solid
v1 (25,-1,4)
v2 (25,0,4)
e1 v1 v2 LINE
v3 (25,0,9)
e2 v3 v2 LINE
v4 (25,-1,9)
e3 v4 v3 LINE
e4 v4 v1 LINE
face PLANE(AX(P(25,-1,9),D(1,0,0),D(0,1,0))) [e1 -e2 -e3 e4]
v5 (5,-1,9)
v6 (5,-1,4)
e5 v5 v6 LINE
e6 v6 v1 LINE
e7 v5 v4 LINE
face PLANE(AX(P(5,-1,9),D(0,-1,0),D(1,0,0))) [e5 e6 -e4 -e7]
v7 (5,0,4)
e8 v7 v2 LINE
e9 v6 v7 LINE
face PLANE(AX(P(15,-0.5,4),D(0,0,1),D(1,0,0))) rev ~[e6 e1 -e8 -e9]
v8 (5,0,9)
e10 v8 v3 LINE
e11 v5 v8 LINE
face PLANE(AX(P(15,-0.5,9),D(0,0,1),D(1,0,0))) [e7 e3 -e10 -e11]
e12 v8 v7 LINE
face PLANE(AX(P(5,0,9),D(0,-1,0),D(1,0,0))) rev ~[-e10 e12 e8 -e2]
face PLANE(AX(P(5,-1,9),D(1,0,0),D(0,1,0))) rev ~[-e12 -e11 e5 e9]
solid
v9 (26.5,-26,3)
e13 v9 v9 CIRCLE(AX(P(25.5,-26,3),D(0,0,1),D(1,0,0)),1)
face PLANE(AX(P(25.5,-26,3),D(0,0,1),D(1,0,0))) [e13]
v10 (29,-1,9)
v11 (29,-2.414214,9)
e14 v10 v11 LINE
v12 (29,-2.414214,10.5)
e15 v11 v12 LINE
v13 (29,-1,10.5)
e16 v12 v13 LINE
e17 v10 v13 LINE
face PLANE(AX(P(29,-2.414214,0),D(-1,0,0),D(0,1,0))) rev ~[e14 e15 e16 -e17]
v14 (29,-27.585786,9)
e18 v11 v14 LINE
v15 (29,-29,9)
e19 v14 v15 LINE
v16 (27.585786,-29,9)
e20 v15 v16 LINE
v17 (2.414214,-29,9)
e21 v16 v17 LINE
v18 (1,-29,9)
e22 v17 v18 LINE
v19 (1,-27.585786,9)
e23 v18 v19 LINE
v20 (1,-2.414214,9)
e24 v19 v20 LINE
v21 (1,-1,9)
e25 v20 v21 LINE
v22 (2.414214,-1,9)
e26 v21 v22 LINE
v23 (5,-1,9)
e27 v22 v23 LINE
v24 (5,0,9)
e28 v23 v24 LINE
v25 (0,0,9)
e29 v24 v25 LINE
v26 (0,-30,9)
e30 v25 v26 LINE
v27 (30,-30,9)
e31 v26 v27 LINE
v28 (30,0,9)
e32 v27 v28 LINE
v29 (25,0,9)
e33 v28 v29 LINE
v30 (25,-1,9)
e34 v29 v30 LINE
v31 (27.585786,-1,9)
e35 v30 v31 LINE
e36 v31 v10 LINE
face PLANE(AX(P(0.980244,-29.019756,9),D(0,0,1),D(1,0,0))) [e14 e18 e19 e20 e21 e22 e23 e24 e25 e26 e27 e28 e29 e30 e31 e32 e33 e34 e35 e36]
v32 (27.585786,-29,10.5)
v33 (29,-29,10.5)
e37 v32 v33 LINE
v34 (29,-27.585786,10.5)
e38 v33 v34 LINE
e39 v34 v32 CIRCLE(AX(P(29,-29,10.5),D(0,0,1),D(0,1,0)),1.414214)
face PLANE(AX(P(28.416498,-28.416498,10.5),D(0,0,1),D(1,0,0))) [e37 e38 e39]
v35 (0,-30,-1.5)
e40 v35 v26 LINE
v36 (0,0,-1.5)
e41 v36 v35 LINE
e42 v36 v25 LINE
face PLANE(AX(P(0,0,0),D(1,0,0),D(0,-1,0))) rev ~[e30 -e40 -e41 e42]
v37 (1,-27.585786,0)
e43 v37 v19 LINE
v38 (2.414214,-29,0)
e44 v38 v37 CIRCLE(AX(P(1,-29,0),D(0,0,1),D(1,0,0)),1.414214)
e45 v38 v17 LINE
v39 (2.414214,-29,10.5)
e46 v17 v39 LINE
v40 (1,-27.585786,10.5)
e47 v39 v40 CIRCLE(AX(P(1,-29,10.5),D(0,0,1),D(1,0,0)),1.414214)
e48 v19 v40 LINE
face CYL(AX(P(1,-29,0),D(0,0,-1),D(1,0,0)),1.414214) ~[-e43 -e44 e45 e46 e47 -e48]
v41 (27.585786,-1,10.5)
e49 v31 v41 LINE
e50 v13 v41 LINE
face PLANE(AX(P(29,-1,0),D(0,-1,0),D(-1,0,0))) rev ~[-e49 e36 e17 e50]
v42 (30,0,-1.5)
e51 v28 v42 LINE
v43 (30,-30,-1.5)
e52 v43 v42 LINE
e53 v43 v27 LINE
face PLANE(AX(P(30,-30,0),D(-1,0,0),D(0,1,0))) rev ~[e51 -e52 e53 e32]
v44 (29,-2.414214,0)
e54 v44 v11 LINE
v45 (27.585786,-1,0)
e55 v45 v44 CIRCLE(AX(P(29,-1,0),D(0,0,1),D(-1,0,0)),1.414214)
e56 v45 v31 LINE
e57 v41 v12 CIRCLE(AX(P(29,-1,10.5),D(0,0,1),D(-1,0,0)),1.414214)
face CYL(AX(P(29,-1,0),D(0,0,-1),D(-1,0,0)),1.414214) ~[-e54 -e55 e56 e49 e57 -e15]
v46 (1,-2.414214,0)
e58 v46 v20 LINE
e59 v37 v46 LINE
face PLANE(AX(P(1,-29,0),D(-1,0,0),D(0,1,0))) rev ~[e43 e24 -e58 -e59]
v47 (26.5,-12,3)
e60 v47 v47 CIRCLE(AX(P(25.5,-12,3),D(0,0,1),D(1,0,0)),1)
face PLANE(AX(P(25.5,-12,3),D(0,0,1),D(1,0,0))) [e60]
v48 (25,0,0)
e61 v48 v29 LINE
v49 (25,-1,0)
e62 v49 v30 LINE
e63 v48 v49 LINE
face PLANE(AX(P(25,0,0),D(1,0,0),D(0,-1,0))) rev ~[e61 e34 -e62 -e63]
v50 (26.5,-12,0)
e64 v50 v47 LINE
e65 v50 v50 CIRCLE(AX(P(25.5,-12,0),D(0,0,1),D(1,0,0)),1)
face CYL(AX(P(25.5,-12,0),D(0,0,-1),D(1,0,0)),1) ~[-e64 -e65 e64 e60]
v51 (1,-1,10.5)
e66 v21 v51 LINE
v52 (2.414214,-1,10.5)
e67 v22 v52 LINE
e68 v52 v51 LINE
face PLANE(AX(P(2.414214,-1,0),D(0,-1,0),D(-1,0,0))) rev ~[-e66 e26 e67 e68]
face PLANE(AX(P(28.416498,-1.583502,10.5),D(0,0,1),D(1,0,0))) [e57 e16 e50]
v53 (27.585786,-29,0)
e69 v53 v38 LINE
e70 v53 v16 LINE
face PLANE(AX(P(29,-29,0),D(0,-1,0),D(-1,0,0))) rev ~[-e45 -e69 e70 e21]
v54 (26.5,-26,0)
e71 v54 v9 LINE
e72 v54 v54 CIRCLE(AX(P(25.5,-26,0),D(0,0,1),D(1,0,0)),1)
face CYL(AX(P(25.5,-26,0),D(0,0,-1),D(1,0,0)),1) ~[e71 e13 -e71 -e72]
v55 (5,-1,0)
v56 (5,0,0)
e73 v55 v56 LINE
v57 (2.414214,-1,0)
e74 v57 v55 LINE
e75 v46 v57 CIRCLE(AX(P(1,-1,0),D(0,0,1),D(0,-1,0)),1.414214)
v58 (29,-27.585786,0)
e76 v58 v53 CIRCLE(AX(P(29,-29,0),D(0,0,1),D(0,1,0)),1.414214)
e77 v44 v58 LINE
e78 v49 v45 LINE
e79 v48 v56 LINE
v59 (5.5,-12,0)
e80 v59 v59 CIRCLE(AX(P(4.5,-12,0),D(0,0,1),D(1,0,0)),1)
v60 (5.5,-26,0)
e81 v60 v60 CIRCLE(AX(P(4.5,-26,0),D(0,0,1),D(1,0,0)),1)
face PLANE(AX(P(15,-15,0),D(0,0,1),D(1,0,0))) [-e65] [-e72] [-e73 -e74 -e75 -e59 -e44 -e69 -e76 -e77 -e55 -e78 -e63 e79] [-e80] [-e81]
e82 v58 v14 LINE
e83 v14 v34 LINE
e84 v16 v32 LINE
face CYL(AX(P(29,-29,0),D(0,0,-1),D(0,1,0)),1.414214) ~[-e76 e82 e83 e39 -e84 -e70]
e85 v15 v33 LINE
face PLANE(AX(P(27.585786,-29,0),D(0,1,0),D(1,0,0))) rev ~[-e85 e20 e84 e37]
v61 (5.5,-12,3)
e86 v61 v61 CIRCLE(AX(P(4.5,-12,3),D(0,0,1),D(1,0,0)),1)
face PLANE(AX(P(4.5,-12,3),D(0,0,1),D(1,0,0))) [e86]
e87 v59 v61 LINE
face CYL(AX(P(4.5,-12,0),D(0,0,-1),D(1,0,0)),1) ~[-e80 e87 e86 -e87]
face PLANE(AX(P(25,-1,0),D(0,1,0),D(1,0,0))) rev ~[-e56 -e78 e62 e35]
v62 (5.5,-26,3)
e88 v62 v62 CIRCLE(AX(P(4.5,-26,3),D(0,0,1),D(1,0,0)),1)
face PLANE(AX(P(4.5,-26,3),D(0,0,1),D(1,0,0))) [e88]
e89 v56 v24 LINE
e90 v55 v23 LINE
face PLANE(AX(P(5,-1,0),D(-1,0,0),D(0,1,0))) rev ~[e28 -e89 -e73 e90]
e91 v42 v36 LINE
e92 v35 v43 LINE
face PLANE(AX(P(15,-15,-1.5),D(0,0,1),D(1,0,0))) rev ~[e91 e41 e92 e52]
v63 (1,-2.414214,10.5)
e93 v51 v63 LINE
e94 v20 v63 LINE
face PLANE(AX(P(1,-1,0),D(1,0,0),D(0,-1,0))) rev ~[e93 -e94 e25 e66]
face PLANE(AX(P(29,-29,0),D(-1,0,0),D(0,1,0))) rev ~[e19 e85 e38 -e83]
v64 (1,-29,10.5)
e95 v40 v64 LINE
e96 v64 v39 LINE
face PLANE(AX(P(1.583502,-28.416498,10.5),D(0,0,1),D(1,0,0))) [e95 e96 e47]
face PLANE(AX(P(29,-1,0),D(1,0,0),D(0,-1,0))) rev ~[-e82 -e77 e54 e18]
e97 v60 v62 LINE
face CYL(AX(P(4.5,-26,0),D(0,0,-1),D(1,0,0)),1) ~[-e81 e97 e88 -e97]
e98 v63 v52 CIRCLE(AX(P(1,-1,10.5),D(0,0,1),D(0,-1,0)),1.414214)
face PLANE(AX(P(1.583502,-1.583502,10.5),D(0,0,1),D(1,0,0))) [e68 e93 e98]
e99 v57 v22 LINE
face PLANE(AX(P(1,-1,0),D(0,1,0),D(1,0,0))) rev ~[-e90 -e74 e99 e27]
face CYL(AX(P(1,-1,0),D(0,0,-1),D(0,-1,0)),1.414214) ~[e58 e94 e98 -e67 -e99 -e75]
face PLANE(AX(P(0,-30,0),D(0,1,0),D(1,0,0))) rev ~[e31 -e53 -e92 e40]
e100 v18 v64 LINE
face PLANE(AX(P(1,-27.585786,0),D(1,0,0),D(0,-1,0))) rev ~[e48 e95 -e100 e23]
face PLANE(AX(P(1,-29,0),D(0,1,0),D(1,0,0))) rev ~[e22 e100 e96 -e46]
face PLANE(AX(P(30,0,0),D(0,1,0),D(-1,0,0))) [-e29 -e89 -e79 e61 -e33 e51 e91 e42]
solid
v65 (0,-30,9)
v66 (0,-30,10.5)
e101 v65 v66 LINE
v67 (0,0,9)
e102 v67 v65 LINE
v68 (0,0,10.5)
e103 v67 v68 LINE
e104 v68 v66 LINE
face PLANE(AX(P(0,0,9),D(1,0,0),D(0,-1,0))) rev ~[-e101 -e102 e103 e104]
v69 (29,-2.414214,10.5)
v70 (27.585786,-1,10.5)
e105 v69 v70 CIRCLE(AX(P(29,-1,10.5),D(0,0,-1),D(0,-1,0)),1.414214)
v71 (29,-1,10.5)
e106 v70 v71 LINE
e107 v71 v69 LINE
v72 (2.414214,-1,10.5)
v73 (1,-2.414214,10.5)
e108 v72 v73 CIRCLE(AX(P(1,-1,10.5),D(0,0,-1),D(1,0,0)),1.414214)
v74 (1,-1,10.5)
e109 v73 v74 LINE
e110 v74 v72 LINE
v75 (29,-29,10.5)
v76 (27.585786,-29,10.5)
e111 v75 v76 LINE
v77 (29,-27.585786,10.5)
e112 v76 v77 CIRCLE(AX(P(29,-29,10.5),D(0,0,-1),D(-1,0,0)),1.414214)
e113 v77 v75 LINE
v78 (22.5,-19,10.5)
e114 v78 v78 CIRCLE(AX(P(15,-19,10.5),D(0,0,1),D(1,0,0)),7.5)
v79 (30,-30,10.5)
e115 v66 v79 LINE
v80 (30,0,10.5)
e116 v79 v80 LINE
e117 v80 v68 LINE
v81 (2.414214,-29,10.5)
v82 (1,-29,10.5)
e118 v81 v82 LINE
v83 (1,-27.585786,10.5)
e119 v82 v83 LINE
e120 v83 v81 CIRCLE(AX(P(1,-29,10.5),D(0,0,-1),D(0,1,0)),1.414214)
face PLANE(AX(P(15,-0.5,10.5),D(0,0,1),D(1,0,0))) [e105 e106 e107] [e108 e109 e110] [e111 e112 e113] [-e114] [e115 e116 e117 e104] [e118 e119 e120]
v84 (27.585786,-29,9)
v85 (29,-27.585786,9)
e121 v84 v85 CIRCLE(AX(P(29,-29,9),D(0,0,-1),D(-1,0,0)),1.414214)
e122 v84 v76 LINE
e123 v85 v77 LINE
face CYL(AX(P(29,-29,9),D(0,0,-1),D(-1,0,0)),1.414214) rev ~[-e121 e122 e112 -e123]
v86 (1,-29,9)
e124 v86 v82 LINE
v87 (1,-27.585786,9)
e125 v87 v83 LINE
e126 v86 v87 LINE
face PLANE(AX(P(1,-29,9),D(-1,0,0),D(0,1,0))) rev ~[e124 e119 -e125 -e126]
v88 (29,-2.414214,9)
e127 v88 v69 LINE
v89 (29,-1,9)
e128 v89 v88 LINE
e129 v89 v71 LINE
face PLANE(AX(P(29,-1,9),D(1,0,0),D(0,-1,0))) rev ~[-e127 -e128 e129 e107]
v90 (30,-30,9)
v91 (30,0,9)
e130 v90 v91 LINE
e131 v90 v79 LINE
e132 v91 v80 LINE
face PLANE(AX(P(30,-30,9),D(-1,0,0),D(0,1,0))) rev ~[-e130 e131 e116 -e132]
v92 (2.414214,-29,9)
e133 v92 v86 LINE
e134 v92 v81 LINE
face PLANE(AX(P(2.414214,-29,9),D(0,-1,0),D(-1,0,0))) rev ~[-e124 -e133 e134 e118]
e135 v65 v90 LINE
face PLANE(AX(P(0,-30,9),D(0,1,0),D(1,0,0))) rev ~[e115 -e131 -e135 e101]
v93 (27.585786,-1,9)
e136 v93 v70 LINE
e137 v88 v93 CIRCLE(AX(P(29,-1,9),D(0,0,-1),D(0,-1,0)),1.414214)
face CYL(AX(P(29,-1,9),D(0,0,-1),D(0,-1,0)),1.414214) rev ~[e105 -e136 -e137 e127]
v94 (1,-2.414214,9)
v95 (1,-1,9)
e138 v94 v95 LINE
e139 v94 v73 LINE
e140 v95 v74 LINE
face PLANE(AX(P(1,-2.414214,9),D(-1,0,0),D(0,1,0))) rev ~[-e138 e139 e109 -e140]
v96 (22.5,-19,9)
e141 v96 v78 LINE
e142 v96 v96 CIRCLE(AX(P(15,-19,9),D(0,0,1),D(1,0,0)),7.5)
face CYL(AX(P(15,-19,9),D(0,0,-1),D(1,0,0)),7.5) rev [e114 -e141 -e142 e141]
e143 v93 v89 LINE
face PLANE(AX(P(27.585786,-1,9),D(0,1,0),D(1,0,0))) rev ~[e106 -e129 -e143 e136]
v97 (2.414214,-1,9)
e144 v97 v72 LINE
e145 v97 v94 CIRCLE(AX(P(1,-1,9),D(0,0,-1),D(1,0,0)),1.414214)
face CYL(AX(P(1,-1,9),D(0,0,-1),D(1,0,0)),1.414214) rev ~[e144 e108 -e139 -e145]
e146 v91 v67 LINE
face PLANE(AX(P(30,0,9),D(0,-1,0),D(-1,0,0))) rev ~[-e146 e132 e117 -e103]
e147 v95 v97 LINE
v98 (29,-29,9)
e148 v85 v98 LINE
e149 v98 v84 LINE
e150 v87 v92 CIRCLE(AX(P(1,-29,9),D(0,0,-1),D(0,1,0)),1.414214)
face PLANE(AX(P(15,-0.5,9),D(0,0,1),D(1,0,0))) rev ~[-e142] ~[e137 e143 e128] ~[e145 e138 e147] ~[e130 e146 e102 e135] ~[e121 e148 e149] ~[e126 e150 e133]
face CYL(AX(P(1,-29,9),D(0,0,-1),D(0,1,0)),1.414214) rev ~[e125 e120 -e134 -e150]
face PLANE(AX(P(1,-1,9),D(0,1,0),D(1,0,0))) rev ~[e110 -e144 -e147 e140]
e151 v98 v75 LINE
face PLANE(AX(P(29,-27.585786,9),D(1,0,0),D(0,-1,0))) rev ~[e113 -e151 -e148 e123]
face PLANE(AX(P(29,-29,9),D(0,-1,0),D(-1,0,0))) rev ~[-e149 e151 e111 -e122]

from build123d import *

# Parameters (mm, degrees)
F0_R     = 1
F0_W     = 20
F0_H     = 1
F1_DEPTH = 1.5
F2_DEPTH = 3
F3_DEPTH = 9
F4_W     = 20
F4_H     = 1
F4_R     = 7.5
F5_DEPTH = 1.5
F6_DEPTH = 10.5
F7_DEPTH = 25
F8_DEPTH = 5
F13_R    = 2


with BuildPart() as f1:
    # F0 (on Top) → F1 (new body)
    with BuildSketch(Plane.XY):
        with BuildLine():
            Line((25, -1), (5, -1))
            Line((5, -1), (2.4142135624, -1))
            ThreePointArc((2.4142135624, -1), (2, -2), (1, -2.4142135624))
            Line((1, -2.4142135624), (1, -27.5857864376))
            ThreePointArc((1, -27.5857864376), (2, -28), (2.4142135624, -29))
            Line((2.4142135624, -29), (27.5857864376, -29))
            ThreePointArc((27.5857864376, -29), (28, -28), (29, -27.5857864376))
            Line((29, -27.5857864376), (29, -2.4142135624))
            ThreePointArc((29, -2.4142135624), (28, -2), (27.5857864376, -1))
            Line((27.5857864376, -1), (25, -1))
        make_face()
        with Locations((4.5, -26)):
            Circle(F0_R, mode=Mode.SUBTRACT)
        with Locations((25.5, -26)):
            Circle(F0_R, mode=Mode.SUBTRACT)
        with Locations((4.5, -12)):
            Circle(F0_R, mode=Mode.SUBTRACT)
        with Locations((25.5, -12)):
            Circle(F0_R, mode=Mode.SUBTRACT)
        with BuildLine():
            Line((27.5857864376, -29), (2.4142135624, -29))
            ThreePointArc((2.4142135624, -29), (2.3065629649, -29.5411961001), (2, -30))
            Line((2, -30), (28, -30))
            ThreePointArc((28, -30), (27.6934370351, -29.5411961001), (27.5857864376, -29))
        make_face()
        with BuildLine():
            ThreePointArc((1, -2.4142135624), (0.4588038999, -2.3065629649), (0, -2))
            Line((0, -2), (0, -28))
            ThreePointArc((0, -28), (0.4588038999, -27.6934370351), (1, -27.5857864376))
            Line((1, -27.5857864376), (1, -2.4142135624))
        make_face()
        with BuildLine():
            Line((30, -28), (30, -2))
            ThreePointArc((30, -2), (29.5411961001, -2.3065629649), (29, -2.4142135624))
            Line((29, -2.4142135624), (29, -27.5857864376))
            ThreePointArc((29, -27.5857864376), (29.5411961001, -27.6934370351), (30, -28))
        make_face()
        with Locations((15, -0.5)):
            Rectangle(F0_W, F0_H)
        with BuildLine():
            ThreePointArc((1, -27.5857864376), (0.4588038999, -27.6934370351), (0, -28))
            Line((0, -28), (0, -30))
            Line((0, -30), (2, -30))
            ThreePointArc((2, -30), (2.3065629649, -29.5411961001), (2.4142135624, -29))
            Line((2.4142135624, -29), (1, -29))
            Line((1, -29), (1, -27.5857864376))
        make_face()
        with BuildLine():
            Line((30, -30), (30, -28))
            ThreePointArc((30, -28), (29.5411961001, -27.6934370351), (29, -27.5857864376))
            Line((29, -27.5857864376), (29, -29))
            Line((29, -29), (27.5857864376, -29))
            ThreePointArc((27.5857864376, -29), (27.6934370351, -29.5411961001), (28, -30))
            Line((28, -30), (30, -30))
        make_face()
        with BuildLine():
            ThreePointArc((2.4142135624, -1), (2.3065629649, -0.4588038999), (2, 0))
            Line((2, 0), (0, 0))
            Line((0, 0), (0, -2))
            ThreePointArc((0, -2), (0.4588038999, -2.3065629649), (1, -2.4142135624))
            Line((1, -2.4142135624), (1, -1))
            Line((1, -1), (2.4142135624, -1))
        make_face()
        with BuildLine():
            Line((30, 0), (28, 0))
            ThreePointArc((28, 0), (27.6934370351, -0.4588038999), (27.5857864376, -1))
            Line((27.5857864376, -1), (29, -1))
            Line((29, -1), (29, -2.4142135624))
            ThreePointArc((29, -2.4142135624), (29.5411961001, -2.3065629649), (30, -2))
            Line((30, -2), (30, 0))
        make_face()
        with Locations((4.5, -12)):
            Circle(F0_R)
        with Locations((4.5, -26)):
            Circle(F0_R)
        with Locations((25.5, -26)):
            Circle(F0_R)
        with Locations((25.5, -12)):
            Circle(F0_R)
        with BuildLine():
            Line((28, 0), (25, 0))
            Line((25, 0), (25, -1))
            Line((25, -1), (27.5857864376, -1))
            ThreePointArc((27.5857864376, -1), (27.6934370351, -0.4588038999), (28, 0))
        make_face()
        with BuildLine():
            Line((5, -1), (5, 0))
            Line((5, 0), (2, 0))
            ThreePointArc((2, 0), (2.3065629649, -0.4588038999), (2.4142135624, -1))
            Line((2.4142135624, -1), (5, -1))
        make_face()
        with BuildLine():
            ThreePointArc((1, -2.4142135624), (2, -2), (2.4142135624, -1))
            Line((2.4142135624, -1), (1, -1))
            Line((1, -1), (1, -2.4142135624))
        make_face()
        with BuildLine():
            ThreePointArc((2.4142135624, -29), (2, -28), (1, -27.5857864376))
            Line((1, -27.5857864376), (1, -29))
            Line((1, -29), (2.4142135624, -29))
        make_face()
        with BuildLine():
            Line((29, -29), (29, -27.5857864376))
            ThreePointArc((29, -27.5857864376), (28, -28), (27.5857864376, -29))
            Line((27.5857864376, -29), (29, -29))
        make_face()
        with BuildLine():
            Line((29, -1), (27.5857864376, -1))
            ThreePointArc((27.5857864376, -1), (28, -2), (29, -2.4142135624))
            Line((29, -2.4142135624), (29, -1))
        make_face()
    extrude(amount=-F1_DEPTH)

    # F0 (on Top) → F2 (join)
    with BuildSketch(Plane.XY):
        with Locations((4.5, -12)):
            Circle(F0_R)
        with Locations((25.5, -12)):
            Circle(F0_R)
        with Locations((25.5, -26)):
            Circle(F0_R)
        with Locations((4.5, -26)):
            Circle(F0_R)
    extrude(amount=F2_DEPTH)

    # F0 (on Top) → F3 (join)
    with BuildSketch(Plane.XY):
        with BuildLine():
            ThreePointArc((1, -27.5857864376), (0.4588038999, -27.6934370351), (0, -28))
            Line((0, -28), (0, -30))
            Line((0, -30), (2, -30))
            ThreePointArc((2, -30), (2.3065629649, -29.5411961001), (2.4142135624, -29))
            Line((2.4142135624, -29), (1, -29))
            Line((1, -29), (1, -27.5857864376))
        make_face()
        with BuildLine():
            Line((27.5857864376, -29), (2.4142135624, -29))
            ThreePointArc((2.4142135624, -29), (2.3065629649, -29.5411961001), (2, -30))
            Line((2, -30), (28, -30))
            ThreePointArc((28, -30), (27.6934370351, -29.5411961001), (27.5857864376, -29))
        make_face()
        with BuildLine():
            Line((30, -30), (30, -28))
            ThreePointArc((30, -28), (29.5411961001, -27.6934370351), (29, -27.5857864376))
            Line((29, -27.5857864376), (29, -29))
            Line((29, -29), (27.5857864376, -29))
            ThreePointArc((27.5857864376, -29), (27.6934370351, -29.5411961001), (28, -30))
            Line((28, -30), (30, -30))
        make_face()
        with BuildLine():
            Line((30, -28), (30, -2))
            ThreePointArc((30, -2), (29.5411961001, -2.3065629649), (29, -2.4142135624))
            Line((29, -2.4142135624), (29, -27.5857864376))
            ThreePointArc((29, -27.5857864376), (29.5411961001, -27.6934370351), (30, -28))
        make_face()
        with BuildLine():
            Line((30, 0), (28, 0))
            ThreePointArc((28, 0), (27.6934370351, -0.4588038999), (27.5857864376, -1))
            Line((27.5857864376, -1), (29, -1))
            Line((29, -1), (29, -2.4142135624))
            ThreePointArc((29, -2.4142135624), (29.5411961001, -2.3065629649), (30, -2))
            Line((30, -2), (30, 0))
        make_face()
        with BuildLine():
            Line((28, 0), (25, 0))
            Line((25, 0), (25, -1))
            Line((25, -1), (27.5857864376, -1))
            ThreePointArc((27.5857864376, -1), (27.6934370351, -0.4588038999), (28, 0))
        make_face()
        with BuildLine():
            Line((5, -1), (5, 0))
            Line((5, 0), (2, 0))
            ThreePointArc((2, 0), (2.3065629649, -0.4588038999), (2.4142135624, -1))
            Line((2.4142135624, -1), (5, -1))
        make_face()
        with BuildLine():
            ThreePointArc((2.4142135624, -1), (2.3065629649, -0.4588038999), (2, 0))
            Line((2, 0), (0, 0))
            Line((0, 0), (0, -2))
            ThreePointArc((0, -2), (0.4588038999, -2.3065629649), (1, -2.4142135624))
            Line((1, -2.4142135624), (1, -1))
            Line((1, -1), (2.4142135624, -1))
        make_face()
        with BuildLine():
            ThreePointArc((1, -2.4142135624), (0.4588038999, -2.3065629649), (0, -2))
            Line((0, -2), (0, -28))
            ThreePointArc((0, -28), (0.4588038999, -27.6934370351), (1, -27.5857864376))
            Line((1, -27.5857864376), (1, -2.4142135624))
        make_face()
    extrude(amount=F3_DEPTH)

    # F0 (on Top) → F6 (join)
    with BuildSketch(Plane.XY):
        with BuildLine():
            ThreePointArc((1, -2.4142135624), (2, -2), (2.4142135624, -1))
            Line((2.4142135624, -1), (1, -1))
            Line((1, -1), (1, -2.4142135624))
        make_face()
        with BuildLine():
            ThreePointArc((2.4142135624, -29), (2, -28), (1, -27.5857864376))
            Line((1, -27.5857864376), (1, -29))
            Line((1, -29), (2.4142135624, -29))
        make_face()
        with BuildLine():
            Line((29, -29), (29, -27.5857864376))
            ThreePointArc((29, -27.5857864376), (28, -28), (27.5857864376, -29))
            Line((27.5857864376, -29), (29, -29))
        make_face()
        with BuildLine():
            Line((29, -1), (27.5857864376, -1))
            ThreePointArc((27.5857864376, -1), (28, -2), (29, -2.4142135624))
            Line((29, -2.4142135624), (29, -1))
        make_face()
    extrude(amount=F6_DEPTH)

    # F7 (cut): faces of the model
    f7_faces = [f1.faces().sort_by_distance(p)[0] for p in [
        (28.3997891226, -1.6002108774, 10.5),
        (1.6002108774, -1.6002108774, 10.5),
        (1.6002108774, -28.3997891226, 10.5),
        (28.3997891226, -28.3997891226, 10.5),
    ]]
    extrude(f7_faces, amount=F7_DEPTH, mode=Mode.SUBTRACT)


with BuildPart() as f5:
    # F4 (on face) → F5 (new body)
    with BuildSketch(Plane.XY.offset(9)):
        with Locations((15, -0.5)):
            Rectangle(F4_W, F4_H)
        Polygon((30, 0), (25, 0), (25, -1), (27.5857864376, -1), (29, -1), (29, -2.4142135624), (29, -27.5857864376), (29, -29), (27.5857864376, -29), (2.4142135624, -29), (1, -29), (1, -27.5857864376), (1, -2.4142135624), (1, -1), (2.4142135624, -1), (5, -1), (5, 0), (0, 0), (0, -30), (30, -30), align=None)
        with BuildLine():
            Line((27.5857864376, -1), (25, -1))
            Line((25, -1), (5, -1))
            Line((5, -1), (2.4142135624, -1))
            ThreePointArc((2.4142135624, -1), (2, -2), (1, -2.4142135624))
            Line((1, -2.4142135624), (1, -27.5857864376))
            ThreePointArc((1, -27.5857864376), (2, -28), (2.4142135624, -29))
            Line((2.4142135624, -29), (27.5857864376, -29))
            ThreePointArc((27.5857864376, -29), (28, -28), (29, -27.5857864376))
            Line((29, -27.5857864376), (29, -2.4142135624))
            ThreePointArc((29, -2.4142135624), (28, -2), (27.5857864376, -1))
        make_face()
        with Locations((15, -19)):
            Circle(F4_R, mode=Mode.SUBTRACT)
    extrude(amount=F5_DEPTH)


with BuildPart() as f8:
    # F4 (on face) → F8 (new body)
    with BuildSketch(Plane.XY.offset(9)):
        with Locations((15, -0.5)):
            Rectangle(F4_W, F4_H)
    extrude(amount=-F8_DEPTH)


with BuildPart() as f11:
    # F9 (on Right) → F11 (revolve)
    with BuildSketch(Plane.YZ):
        with BuildLine():
            Line((15.2258750796, -40.7793708146), (25.2258750796, -40.7793708146))
            ThreePointArc((25.2258750796, -40.7793708146), (21.3738474037, -35.9129389037), (15.7530112624, -38.5447591543))
            Line((15.7530112624, -38.5447591543), (9.7055286169, -38.5447591543))
            Line((9.7055286169, -38.5447591543), (9.7055286169, -36.1464507878))
            Line((9.7055286169, -36.1464507878), (5.4970784113, -36.1464507878))
            Line((5.4970784113, -36.1464507878), (5.4970784113, -40.7793708146))
            Line((5.4970784113, -40.7793708146), (15.2258750796, -40.7793708146))
        make_face()
    revolve(axis=Axis((0, 20.2258750796, -40.7793708146), (0, 1, 0)))


with BuildPart() as f12:
    # F10 (on Right) → F12 (revolve)
    with BuildSketch(Plane.YZ):
        with BuildLine():
            ThreePointArc((18.9868118614, -35.8321774343), (23.3636113326, -36.7588470668), (25.3258750796, -40.7793708146))
            Line((25.3258750796, -40.7793708146), (26.2448396534, -40.7793708146))
            Line((26.2448396534, -40.7793708146), (30.2728638053, -40.7793708146))
            Line((30.2728638053, -40.7793708146), (30.2728638053, -38.8744622469))
            Line((30.2728638053, -38.8744622469), (26.2448396534, -38.8744622469))
            Line((26.2448396534, -38.8744622469), (26.2448396534, -34.7860343754))
            Line((26.2448396534, -34.7860343754), (18.9868118614, -34.7860343754))
            Line((18.9868118614, -34.7860343754), (18.9868118614, -35.8321774343))
        make_face()
    revolve(axis=Axis((0, 28.2588517293, -40.7793708146), (0, 1, 0)))

    # F13
    f13_edges = [f12.edges().sort_by_distance(p)[0] for p in [
        (0, 26.24484, -42.684279),
    ]]
    fillet(f13_edges, radius=F13_R)


solid = Compound([f1.part, f5.part, f8.part])
